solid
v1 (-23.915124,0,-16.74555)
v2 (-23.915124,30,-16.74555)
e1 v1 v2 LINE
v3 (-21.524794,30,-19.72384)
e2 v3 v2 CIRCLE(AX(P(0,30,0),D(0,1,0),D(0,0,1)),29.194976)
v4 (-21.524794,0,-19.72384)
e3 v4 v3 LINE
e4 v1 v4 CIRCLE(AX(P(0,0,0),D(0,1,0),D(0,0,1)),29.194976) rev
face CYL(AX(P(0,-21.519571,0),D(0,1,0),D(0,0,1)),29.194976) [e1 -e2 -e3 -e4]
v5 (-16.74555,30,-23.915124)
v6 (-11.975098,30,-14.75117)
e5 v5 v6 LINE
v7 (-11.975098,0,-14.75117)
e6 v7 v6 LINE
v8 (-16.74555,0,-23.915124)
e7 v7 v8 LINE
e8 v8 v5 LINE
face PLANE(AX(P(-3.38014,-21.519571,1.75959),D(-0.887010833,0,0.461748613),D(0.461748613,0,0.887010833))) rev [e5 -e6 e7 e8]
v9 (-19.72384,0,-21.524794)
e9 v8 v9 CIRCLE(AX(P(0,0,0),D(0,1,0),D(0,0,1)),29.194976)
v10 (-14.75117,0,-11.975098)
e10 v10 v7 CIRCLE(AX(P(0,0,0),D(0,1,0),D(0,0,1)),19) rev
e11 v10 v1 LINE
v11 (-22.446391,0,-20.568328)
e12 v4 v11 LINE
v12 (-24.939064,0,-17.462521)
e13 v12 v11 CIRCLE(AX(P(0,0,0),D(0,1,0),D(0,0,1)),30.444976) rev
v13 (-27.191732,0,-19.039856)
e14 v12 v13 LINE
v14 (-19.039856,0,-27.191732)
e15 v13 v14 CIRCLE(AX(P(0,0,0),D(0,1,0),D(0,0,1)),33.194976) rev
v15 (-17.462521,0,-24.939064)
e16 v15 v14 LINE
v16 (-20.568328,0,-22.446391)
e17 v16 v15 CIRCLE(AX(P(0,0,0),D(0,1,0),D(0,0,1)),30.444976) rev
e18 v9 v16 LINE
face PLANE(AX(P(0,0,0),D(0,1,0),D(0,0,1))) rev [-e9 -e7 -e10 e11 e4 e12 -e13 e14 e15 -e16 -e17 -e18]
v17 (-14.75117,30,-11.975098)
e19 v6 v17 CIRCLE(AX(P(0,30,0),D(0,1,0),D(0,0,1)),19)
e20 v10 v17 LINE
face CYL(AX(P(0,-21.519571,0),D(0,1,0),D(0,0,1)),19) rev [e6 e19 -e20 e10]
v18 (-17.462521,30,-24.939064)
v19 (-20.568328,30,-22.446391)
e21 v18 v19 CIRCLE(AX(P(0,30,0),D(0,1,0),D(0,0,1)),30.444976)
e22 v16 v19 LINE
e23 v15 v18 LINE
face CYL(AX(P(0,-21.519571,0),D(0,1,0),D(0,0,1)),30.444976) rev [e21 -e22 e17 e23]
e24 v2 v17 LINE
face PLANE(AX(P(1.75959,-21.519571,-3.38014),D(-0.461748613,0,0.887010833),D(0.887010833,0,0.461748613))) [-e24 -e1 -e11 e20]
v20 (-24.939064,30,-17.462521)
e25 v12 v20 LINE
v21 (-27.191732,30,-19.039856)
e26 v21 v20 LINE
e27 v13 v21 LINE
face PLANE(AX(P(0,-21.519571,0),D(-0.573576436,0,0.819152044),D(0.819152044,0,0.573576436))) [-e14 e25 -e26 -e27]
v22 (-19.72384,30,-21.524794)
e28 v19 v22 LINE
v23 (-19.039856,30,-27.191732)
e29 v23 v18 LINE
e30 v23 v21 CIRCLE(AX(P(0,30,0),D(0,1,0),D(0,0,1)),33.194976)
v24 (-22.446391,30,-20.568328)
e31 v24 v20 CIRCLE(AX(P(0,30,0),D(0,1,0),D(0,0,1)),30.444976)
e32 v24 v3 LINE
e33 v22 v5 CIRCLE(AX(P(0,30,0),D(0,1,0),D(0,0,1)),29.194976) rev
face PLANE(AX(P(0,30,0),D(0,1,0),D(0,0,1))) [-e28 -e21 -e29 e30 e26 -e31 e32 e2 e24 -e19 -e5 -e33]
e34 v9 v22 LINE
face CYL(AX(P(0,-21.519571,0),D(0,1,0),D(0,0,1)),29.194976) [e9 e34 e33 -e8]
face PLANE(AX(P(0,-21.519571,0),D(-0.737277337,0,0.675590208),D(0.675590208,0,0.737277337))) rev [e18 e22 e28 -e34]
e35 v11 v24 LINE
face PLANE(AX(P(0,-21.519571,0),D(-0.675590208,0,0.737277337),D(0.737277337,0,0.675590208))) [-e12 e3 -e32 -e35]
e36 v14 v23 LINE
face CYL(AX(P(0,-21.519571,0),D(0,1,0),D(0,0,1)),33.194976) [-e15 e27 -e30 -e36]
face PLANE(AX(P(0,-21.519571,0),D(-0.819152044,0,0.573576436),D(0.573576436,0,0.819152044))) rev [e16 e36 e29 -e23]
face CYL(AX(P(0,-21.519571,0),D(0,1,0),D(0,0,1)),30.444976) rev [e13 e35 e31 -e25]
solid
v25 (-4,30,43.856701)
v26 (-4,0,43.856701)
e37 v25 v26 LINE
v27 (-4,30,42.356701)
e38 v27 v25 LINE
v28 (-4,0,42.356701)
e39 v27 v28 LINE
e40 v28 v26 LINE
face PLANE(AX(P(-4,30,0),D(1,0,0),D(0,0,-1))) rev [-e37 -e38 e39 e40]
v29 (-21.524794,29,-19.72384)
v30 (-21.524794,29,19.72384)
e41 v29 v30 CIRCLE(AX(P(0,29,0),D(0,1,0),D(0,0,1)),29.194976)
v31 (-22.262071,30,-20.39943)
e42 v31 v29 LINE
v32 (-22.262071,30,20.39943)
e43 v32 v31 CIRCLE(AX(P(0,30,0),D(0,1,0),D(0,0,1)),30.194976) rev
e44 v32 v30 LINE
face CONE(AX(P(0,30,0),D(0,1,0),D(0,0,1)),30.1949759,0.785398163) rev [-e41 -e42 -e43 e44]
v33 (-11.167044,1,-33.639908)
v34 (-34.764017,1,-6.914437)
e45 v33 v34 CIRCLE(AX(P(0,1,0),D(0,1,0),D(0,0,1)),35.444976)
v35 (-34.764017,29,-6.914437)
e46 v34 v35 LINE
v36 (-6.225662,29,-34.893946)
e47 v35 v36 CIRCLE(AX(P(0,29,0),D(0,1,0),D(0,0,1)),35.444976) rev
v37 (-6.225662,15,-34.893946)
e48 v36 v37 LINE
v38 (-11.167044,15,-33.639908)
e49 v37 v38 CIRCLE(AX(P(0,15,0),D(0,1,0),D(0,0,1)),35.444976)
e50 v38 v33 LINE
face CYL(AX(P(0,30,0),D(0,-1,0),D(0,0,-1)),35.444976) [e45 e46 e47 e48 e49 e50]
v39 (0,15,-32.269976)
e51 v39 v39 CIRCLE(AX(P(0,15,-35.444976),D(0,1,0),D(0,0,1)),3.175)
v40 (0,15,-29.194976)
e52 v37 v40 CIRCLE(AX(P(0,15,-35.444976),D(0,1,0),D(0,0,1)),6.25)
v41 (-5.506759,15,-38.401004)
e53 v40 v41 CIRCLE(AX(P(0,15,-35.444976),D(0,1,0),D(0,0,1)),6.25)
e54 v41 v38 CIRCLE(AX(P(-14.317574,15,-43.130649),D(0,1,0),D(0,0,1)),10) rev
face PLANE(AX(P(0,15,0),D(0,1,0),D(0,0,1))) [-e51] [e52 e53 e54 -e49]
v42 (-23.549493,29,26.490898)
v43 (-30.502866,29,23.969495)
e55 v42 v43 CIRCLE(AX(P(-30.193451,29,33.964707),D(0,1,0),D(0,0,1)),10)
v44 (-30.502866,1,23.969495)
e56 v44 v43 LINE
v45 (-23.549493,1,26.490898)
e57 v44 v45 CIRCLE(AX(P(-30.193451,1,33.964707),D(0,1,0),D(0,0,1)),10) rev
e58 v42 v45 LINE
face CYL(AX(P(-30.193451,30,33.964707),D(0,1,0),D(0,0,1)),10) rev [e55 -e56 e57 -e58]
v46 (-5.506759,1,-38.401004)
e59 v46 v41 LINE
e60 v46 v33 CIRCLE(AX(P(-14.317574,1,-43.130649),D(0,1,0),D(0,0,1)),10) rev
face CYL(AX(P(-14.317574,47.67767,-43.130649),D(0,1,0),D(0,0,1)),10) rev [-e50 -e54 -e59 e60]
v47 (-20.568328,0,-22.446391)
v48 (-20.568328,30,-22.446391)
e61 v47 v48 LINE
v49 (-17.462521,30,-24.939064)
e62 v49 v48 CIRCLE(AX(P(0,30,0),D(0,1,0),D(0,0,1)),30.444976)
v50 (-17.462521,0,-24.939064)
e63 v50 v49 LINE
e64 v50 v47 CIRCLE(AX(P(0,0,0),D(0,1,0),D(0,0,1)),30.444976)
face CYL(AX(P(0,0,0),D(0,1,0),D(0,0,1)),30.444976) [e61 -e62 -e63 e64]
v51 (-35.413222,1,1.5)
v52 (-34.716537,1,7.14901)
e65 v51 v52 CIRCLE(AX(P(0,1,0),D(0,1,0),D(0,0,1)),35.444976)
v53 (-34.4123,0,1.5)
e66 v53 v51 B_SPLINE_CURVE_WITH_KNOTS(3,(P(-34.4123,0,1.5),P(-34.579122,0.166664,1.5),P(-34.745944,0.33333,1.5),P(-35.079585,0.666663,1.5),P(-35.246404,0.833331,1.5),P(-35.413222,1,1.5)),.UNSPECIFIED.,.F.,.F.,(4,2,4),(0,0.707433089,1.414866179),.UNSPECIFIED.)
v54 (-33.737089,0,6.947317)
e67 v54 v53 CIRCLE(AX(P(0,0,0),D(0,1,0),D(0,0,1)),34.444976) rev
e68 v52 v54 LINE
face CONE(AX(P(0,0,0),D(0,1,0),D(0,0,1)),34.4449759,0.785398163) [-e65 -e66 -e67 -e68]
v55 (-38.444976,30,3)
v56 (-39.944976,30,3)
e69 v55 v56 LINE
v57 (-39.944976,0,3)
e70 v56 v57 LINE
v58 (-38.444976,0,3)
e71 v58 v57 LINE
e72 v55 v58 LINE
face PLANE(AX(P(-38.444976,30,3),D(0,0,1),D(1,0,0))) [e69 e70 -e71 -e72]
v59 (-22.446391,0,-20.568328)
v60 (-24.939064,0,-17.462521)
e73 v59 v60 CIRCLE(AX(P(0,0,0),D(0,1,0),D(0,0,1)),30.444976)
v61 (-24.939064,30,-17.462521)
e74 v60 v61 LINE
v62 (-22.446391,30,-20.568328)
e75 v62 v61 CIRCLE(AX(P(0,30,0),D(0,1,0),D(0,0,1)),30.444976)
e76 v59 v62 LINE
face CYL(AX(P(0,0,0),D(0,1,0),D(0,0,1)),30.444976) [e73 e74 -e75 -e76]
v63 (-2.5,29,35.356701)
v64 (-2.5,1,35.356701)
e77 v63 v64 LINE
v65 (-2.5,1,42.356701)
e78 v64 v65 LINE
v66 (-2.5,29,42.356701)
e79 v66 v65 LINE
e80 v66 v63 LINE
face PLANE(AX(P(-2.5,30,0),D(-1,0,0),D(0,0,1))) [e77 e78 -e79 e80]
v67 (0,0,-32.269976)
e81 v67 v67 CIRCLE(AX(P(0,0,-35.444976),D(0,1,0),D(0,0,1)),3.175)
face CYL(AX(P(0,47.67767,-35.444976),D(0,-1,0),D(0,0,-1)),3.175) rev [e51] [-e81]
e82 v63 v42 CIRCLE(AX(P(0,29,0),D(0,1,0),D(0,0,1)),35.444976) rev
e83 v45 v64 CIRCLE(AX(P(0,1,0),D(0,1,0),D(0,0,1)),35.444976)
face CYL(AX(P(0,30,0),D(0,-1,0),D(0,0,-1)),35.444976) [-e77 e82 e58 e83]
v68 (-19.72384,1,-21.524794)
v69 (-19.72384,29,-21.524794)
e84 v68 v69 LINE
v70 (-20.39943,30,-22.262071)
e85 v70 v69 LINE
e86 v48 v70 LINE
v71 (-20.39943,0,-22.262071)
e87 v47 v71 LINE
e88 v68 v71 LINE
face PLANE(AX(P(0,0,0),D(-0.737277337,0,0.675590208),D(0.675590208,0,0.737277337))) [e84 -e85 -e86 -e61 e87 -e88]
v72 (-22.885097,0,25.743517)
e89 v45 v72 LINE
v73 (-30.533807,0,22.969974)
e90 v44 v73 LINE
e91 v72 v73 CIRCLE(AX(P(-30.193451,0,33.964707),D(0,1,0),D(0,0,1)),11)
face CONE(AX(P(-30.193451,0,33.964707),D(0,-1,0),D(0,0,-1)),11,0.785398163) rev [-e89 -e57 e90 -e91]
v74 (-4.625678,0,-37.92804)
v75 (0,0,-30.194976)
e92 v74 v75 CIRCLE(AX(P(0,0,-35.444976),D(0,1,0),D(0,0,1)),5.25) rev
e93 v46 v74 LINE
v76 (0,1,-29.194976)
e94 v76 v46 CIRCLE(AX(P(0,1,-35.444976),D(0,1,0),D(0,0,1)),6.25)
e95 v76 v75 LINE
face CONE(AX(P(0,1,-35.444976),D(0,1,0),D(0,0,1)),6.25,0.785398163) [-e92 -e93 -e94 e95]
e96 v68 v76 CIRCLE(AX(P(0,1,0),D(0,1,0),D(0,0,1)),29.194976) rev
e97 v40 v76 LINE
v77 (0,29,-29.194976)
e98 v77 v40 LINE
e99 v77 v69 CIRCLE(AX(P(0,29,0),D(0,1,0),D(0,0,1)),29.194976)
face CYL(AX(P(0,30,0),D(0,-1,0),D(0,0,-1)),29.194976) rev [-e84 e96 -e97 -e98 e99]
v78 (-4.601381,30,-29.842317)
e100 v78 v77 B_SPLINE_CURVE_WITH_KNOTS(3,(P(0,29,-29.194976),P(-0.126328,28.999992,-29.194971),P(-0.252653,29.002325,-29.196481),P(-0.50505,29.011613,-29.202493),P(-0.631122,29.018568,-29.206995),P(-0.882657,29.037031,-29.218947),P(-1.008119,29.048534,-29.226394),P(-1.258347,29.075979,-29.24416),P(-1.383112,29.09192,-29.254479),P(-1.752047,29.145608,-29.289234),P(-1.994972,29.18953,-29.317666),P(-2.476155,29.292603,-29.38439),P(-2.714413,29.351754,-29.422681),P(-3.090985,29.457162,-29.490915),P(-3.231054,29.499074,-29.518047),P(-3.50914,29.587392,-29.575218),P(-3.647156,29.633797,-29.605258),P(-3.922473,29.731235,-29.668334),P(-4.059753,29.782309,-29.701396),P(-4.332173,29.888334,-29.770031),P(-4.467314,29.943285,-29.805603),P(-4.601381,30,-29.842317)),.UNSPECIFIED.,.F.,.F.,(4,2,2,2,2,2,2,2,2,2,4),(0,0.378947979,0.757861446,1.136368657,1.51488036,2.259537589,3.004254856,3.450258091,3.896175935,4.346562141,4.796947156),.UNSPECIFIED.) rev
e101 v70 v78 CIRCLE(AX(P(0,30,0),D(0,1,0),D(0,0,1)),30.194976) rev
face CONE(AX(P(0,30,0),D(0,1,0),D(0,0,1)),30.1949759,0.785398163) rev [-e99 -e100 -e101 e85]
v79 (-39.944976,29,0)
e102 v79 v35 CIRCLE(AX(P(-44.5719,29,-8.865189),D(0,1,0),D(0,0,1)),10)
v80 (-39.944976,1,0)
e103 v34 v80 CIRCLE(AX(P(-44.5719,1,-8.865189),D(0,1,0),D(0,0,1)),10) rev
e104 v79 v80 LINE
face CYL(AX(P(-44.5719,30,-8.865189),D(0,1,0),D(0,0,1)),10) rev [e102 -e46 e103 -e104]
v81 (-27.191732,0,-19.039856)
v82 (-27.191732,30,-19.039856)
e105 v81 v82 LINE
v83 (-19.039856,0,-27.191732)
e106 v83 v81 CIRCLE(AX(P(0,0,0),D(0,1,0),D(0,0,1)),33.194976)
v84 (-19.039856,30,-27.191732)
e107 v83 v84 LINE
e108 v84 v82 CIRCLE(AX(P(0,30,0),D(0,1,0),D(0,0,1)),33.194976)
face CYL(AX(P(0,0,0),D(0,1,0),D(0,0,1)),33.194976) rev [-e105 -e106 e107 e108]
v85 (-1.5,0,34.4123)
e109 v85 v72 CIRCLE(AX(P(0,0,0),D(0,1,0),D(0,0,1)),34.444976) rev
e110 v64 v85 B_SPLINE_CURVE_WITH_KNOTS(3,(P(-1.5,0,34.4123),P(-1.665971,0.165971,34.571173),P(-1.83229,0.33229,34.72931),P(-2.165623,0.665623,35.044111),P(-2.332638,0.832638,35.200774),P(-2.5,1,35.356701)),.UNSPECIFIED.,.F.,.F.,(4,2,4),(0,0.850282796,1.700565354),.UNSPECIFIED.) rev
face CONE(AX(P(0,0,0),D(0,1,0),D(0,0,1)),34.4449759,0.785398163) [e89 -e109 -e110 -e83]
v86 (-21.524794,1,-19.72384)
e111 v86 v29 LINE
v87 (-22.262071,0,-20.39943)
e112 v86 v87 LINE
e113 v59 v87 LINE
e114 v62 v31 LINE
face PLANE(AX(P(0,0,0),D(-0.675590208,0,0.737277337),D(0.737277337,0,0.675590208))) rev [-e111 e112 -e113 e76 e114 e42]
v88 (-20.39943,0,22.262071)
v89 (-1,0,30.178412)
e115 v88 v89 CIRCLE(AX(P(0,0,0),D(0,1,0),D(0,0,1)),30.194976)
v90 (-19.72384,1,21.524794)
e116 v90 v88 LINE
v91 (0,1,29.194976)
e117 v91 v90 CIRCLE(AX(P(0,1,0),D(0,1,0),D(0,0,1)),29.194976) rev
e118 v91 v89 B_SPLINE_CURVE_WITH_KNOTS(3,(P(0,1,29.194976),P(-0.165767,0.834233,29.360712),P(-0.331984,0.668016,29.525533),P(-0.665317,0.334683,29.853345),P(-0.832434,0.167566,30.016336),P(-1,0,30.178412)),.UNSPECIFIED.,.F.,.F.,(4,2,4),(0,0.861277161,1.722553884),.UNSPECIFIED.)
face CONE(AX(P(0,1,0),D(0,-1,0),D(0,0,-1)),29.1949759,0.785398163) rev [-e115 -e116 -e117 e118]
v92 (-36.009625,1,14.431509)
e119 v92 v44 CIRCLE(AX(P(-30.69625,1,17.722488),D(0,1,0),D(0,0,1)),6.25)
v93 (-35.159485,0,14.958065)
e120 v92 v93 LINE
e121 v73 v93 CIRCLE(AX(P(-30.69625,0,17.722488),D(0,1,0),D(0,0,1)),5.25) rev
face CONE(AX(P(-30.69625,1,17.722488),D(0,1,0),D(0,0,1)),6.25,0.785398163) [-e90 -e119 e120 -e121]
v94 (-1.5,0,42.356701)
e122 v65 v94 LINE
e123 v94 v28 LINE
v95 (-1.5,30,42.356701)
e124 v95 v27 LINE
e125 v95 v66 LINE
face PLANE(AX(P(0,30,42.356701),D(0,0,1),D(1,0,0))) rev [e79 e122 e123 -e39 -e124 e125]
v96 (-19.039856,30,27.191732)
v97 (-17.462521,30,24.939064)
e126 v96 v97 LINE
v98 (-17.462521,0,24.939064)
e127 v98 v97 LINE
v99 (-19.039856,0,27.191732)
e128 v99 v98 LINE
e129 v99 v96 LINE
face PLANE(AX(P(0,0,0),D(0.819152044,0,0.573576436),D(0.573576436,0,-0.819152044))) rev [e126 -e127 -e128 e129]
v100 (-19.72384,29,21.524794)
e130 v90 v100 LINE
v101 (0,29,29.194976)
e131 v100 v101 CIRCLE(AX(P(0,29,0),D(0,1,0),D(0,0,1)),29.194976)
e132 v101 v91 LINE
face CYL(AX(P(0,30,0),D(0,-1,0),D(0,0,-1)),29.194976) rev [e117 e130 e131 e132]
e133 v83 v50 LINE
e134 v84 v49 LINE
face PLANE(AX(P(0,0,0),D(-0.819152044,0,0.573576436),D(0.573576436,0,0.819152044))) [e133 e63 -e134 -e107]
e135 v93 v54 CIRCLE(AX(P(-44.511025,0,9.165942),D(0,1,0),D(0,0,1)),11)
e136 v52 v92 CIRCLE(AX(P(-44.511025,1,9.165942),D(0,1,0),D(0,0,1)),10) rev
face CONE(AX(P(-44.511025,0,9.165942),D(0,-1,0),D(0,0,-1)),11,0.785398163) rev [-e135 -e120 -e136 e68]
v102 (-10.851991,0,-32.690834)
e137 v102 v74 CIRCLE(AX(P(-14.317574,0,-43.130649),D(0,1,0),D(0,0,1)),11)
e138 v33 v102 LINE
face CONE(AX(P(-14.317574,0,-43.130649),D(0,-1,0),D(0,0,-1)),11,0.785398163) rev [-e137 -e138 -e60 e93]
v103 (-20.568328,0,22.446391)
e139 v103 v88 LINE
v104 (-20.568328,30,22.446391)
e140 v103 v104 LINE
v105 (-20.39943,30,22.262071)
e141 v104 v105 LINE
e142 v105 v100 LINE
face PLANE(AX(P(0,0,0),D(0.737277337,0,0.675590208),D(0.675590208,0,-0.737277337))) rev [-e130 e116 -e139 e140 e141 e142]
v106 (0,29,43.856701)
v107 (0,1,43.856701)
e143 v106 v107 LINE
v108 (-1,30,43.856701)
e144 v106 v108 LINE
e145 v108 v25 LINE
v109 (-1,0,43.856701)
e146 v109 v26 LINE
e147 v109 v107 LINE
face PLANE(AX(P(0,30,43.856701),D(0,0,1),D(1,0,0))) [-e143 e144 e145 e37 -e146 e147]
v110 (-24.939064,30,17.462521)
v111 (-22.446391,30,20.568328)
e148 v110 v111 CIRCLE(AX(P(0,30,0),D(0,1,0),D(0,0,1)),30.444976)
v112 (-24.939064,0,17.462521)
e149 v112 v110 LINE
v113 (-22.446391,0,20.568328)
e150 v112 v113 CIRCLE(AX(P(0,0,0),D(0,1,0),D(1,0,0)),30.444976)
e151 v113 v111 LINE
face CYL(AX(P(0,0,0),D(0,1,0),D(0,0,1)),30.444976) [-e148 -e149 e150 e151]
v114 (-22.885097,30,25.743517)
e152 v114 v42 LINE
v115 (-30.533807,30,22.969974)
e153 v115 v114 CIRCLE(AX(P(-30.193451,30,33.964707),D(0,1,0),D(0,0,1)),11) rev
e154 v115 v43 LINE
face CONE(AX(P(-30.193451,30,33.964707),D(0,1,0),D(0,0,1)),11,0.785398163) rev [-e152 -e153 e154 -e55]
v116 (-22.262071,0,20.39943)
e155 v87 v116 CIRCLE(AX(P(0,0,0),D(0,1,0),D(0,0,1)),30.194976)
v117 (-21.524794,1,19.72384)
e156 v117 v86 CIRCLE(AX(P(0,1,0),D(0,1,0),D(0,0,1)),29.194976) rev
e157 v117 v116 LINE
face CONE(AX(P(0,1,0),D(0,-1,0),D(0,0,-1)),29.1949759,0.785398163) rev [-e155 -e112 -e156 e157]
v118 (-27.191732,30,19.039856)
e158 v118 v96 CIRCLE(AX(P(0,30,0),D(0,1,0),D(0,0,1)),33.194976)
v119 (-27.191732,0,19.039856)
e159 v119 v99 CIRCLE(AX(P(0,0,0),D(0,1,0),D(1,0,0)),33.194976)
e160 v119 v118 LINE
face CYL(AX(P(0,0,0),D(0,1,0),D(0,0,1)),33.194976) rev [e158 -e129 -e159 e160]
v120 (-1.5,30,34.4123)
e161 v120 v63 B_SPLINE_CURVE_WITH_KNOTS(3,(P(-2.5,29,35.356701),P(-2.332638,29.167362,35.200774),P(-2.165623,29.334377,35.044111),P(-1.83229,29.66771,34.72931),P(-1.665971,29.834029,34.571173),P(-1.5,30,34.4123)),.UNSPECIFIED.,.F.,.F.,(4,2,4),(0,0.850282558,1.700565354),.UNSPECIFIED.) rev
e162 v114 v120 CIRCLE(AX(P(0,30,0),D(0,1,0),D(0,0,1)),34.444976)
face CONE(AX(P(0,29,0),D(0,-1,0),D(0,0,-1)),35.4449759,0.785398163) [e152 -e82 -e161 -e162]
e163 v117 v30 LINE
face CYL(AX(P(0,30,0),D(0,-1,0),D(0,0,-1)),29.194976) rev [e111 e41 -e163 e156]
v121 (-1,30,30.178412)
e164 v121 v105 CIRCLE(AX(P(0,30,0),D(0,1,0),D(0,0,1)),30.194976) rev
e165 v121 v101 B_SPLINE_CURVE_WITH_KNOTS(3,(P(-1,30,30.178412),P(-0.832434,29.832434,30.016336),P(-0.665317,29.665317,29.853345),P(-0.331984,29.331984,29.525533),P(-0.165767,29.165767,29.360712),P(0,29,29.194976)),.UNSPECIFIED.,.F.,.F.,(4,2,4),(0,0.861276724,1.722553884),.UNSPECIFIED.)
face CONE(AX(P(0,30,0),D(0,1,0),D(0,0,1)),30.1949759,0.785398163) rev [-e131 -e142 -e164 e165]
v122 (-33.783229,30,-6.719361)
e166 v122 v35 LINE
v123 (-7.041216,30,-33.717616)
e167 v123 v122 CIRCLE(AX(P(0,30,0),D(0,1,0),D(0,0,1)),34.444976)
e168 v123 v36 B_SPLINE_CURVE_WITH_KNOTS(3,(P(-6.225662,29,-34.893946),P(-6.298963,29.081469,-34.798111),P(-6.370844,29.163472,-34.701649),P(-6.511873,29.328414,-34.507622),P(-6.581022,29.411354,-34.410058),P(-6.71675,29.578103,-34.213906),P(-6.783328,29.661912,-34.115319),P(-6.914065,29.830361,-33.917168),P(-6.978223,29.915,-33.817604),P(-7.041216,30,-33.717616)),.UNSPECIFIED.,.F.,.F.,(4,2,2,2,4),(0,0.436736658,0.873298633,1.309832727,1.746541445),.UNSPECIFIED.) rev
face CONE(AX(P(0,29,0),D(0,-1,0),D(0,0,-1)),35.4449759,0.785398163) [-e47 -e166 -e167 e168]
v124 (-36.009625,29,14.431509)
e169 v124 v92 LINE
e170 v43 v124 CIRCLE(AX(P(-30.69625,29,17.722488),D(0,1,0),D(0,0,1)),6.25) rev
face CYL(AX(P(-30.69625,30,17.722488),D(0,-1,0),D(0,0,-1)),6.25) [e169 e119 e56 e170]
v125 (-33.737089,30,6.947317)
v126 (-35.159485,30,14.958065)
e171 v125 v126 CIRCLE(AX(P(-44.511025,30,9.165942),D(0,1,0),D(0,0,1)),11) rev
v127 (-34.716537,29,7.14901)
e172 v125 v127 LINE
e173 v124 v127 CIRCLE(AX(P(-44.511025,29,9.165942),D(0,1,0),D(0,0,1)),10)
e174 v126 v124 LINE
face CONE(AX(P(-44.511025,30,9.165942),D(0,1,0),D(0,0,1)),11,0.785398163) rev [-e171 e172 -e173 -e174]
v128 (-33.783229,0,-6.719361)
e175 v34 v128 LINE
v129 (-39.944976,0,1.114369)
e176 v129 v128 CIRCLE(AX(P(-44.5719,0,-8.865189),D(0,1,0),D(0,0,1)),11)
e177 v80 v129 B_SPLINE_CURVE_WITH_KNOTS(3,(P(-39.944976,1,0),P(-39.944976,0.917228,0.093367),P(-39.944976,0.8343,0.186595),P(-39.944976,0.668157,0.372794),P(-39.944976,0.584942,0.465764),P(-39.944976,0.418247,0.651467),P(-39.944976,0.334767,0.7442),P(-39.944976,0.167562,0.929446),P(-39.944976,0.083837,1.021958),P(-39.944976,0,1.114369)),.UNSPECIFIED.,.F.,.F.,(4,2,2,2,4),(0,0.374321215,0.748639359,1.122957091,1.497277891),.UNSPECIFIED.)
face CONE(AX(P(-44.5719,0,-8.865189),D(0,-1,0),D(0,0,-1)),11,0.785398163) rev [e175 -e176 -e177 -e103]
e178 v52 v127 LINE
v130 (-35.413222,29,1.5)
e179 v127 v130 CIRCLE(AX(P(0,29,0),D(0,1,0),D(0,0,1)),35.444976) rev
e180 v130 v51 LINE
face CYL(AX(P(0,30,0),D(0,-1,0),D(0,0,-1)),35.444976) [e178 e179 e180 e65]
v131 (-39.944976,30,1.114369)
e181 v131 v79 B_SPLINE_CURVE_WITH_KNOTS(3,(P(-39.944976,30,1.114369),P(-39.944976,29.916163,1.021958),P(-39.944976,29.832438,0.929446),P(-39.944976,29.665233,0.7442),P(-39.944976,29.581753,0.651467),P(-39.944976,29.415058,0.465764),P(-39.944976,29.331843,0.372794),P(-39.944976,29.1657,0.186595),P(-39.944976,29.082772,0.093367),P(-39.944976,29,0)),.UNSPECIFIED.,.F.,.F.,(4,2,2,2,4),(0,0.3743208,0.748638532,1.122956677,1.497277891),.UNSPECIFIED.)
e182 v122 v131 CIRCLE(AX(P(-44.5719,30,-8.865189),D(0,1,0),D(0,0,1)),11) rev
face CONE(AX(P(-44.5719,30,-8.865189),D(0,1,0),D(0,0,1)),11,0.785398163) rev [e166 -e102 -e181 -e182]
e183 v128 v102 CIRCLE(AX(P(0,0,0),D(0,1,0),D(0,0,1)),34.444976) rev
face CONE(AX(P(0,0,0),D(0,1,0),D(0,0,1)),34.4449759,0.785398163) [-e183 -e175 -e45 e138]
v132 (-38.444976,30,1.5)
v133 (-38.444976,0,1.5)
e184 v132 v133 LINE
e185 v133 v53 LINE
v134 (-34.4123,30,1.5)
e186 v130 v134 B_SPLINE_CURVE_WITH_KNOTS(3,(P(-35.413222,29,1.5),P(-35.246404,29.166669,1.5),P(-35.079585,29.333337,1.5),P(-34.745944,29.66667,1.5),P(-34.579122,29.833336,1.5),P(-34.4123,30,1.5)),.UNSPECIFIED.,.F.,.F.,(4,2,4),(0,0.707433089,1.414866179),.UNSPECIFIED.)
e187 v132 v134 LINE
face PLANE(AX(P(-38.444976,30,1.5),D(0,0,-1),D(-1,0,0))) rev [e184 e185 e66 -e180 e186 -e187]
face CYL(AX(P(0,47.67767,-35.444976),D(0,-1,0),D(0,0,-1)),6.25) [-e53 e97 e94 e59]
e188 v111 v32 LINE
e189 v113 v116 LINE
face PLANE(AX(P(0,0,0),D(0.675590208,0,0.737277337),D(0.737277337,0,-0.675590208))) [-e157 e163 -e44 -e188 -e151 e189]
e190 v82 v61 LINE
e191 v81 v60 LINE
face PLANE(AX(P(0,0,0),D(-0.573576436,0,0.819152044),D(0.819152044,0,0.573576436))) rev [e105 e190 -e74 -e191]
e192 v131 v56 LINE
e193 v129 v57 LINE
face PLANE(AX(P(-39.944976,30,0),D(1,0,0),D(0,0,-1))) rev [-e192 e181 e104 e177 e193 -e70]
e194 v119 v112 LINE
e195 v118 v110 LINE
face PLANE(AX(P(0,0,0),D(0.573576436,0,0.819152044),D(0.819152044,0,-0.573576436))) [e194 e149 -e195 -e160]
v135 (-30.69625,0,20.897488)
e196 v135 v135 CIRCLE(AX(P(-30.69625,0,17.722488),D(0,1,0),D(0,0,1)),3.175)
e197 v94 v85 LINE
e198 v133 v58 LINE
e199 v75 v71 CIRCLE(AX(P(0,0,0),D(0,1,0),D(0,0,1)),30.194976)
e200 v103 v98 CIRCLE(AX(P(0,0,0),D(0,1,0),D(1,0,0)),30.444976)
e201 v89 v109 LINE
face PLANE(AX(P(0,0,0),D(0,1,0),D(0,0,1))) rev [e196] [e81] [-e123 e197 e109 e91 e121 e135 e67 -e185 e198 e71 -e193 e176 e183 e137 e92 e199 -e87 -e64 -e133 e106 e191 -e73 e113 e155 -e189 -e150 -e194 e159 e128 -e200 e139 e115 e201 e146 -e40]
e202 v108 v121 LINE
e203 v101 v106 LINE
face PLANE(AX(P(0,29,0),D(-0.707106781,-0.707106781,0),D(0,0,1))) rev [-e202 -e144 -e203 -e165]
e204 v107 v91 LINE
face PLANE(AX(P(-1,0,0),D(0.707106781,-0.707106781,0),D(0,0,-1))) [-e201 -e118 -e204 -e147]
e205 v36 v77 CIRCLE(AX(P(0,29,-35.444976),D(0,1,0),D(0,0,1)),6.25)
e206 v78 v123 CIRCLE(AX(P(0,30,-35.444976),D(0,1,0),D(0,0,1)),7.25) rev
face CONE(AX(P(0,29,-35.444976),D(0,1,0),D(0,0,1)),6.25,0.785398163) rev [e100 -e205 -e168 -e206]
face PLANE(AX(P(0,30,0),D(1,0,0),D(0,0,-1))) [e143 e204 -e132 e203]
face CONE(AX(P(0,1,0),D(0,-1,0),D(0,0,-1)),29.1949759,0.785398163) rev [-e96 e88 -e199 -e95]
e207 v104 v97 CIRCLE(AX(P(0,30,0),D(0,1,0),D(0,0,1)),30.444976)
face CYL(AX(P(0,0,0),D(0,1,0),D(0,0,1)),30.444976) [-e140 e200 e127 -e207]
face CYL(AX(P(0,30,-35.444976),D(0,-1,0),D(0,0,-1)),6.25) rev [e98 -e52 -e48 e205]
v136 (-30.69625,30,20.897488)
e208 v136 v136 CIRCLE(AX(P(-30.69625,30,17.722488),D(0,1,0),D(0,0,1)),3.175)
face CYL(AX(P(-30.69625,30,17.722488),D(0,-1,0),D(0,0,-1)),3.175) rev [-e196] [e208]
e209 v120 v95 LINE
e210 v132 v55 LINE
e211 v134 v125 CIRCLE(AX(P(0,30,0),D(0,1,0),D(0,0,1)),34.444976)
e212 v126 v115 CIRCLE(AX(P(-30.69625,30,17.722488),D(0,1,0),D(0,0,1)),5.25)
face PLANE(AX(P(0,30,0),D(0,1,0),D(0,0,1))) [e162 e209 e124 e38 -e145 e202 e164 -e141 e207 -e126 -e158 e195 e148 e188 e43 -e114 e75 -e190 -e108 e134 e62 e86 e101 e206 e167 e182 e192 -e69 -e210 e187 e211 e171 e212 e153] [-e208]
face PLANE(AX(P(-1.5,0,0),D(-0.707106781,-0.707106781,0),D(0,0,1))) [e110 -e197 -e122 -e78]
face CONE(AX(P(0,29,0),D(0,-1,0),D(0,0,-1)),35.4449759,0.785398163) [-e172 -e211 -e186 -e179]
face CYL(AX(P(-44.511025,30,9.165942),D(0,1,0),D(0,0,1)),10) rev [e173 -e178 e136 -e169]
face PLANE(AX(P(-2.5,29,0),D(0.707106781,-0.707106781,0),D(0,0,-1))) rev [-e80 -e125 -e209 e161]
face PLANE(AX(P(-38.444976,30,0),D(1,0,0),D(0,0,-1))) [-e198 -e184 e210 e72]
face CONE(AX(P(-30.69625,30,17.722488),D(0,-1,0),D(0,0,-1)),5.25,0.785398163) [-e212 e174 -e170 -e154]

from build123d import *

# Parameters (mm, degrees)
SKETCH3_R           = 3.175
BOSS_EXTRUDE2_DEPTH = 30
SKETCH3_6_R         = 6.25
SKETCH3_6_R_2       = 3.175
BOSS_EXTRUDE3_DEPTH = 15
FILLET1_R           = 10
CHAMFER1_SIZE       = 1
JAW_SLOT_DEPTH      = 67.475644682
TPU_JAW_DEPTH       = 30
SLOT_PATTERN_COUNT  = 2
SLOT_PATTERN_ANGLE  = 90


with BuildPart() as part:
    # Sketch3 → Boss-Extrude2 (new body)
    with BuildSketch(Plane(origin=(0, 0, 0), x_dir=(1, 0, 0), z_dir=(0, 1, 0))):
        with BuildLine():
            ThreePointArc((0, 29.1949759), (-4.220104361, 30.834854515), (-6.225661875, 34.893945761))
            ThreePointArc((-6.225661875, 34.893945761), (-27.175492191, 22.756074809), (-35.4449759, 0))
            Line((-35.4449759, 0), (-39.9449759, 0))
            Line((-39.9449759, 0), (-39.9449759, -3))
            Line((-39.9449759, -3), (-38.4449759, -3))
            Line((-38.4449759, -3), (-38.4449759, -1.5))
            Line((-38.4449759, -1.5), (-35.413222341, -1.5))
            ThreePointArc((-35.413222341, -1.5), (-34.775367062, -6.857124927), (-33.331874405, -12.055391541))
            ThreePointArc((-33.331874405, -12.055391541), (-36.10890834, -20.84748795), (-27.10621253, -22.83855422))
            ThreePointArc((-27.10621253, -22.83855422), (-16.071961789, -31.591745137), (-2.5, -35.356701155))
            Line((-2.5, -35.356701155), (-2.5, -42.356701155))
            Line((-2.5, -42.356701155), (-4, -42.356701155))
            Line((-4, -42.356701155), (-4, -43.856701155))
            Line((-4, -43.856701155), (0, -43.856701155))
            Line((0, -43.856701155), (0, -29.1949759))
            ThreePointArc((0, -29.1949759), (-29.1949759, 0), (0, 29.1949759))
        make_face()
        with Locations(Location((-30.696249566, -17.72248795, 0), (0, 0, 270))):
            Circle(SKETCH3_R, mode=Mode.SUBTRACT)
    extrude(amount=BOSS_EXTRUDE2_DEPTH)

    # Sketch3<6> → Boss-Extrude3 (add)
    with BuildSketch(Plane(origin=(0, 0, 0), x_dir=(1, 0, 0), z_dir=(0, 1, 0))):
        with Locations((0, 35.4449759)):
            Circle(SKETCH3_6_R)
        with Locations(Location((0, 35.4449759, 0), (0, 0, 270))):
            Circle(SKETCH3_6_R_2, mode=Mode.SUBTRACT)
    extrude(amount=BOSS_EXTRUDE3_DEPTH)

    # Fillet1
    # the kernel refuses this fillet: 10 mm, written as the material it adds along each edge
    with BuildSketch(Plane(origin=(-27.10621253, 0, 22.83855422), x_dir=(0.6976659907384, 0, 0.7164231747835959), z_dir=(0, 1, 0))) as fillet1_piece_1:
        with BuildLine():
            CenterArc((5.817172713, -9.974107894), FILLET1_R, 94.123965917, 43.409086789)
            ThreePointArc((-1.559496763, -3.222460137), (-0.544085424, -1.725278219), (0, 0))
            ThreePointArc((0, 0), (2.549013098, -0.091774506), (5.098026196, 0))
        make_face()
    extrude(amount=30)
    with BuildSketch(Plane(origin=(-33.331874405, 0, 12.055391541), x_dir=(-0.27160767385328266, 0, -0.9624080587276942), z_dir=(0, 1, 0))) as fillet1_piece_2:
        with BuildLine():
            CenterArc((5.817172713, 9.974107894), FILLET1_R, 222.466947294, 43.409086789)
            ThreePointArc((-1.559496763, 3.222460137), (-0.544085424, 1.725278219), (0, 0))
            ThreePointArc((0, 0), (2.549013098, 0.091774506), (5.098026196, 0))
        make_face()
    extrude(amount=30)
    with BuildSketch(Plane(origin=(-6.225661875, 0, -34.893945761), x_dir=(-0.9692736645916937, 0, 0.24598488394409268), z_dir=(0, 1, 0))) as fillet1_piece_3:
        with BuildLine():
            CenterArc((5.817172713, -9.974107894), FILLET1_R, 94.123965917, 43.409086789)
            ThreePointArc((-1.559496763, -3.222460137), (-0.544085424, -1.725278219), (0, 0))
            ThreePointArc((0, 0), (2.549013098, -0.091774506), (5.098026196, 0))
        make_face()
    extrude(amount=15)
    with BuildSketch(Plane(origin=(-35.4449759, 0, 0), x_dir=(-1, 0, 0), z_dir=(0, 1, 0))) as fillet1_piece_4:
        with BuildLine():
            CenterArc((9.126923994, -8.865188907), FILLET1_R, 117.560980045, 51.189901885)
            ThreePointArc((-0.680958838, -6.914436655), (-0.17065051, -3.473943695), (0, 0))
            Line((0, 0), (4.5, 0))
        make_face()
    extrude(amount=30)

    # Chamfer1
    chamfer1_edges = [part.edges().sort_by_distance(p)[0] for p in [
        (-36.569195939, 0, -2.868795874),
        (-36.569195939, 30, -2.868795874),
        (-26.570252382, 0, -23.459923378),
        (-24.814344184, 30, -25.309971143),
        (-7.880536789, 0, -35.477901284),
        (5.363659035, 0, -38.653349594),
        (-29.1949759, 0, 0),
        (0, 0, 36.525838527),
        (-2.5, 0, 38.856701155),
        (-13.758438746, 0, 32.665756991),
        (-26.784495391, 0, 24.563695697),
        (-36.10890834, 0, 20.84748795),
        (-34.665032179, 0, 10.914205587),
        (-35.178454065, 0, 4.338511975),
        (-4.220104361, 30, -30.834854515),
        (-29.1949759, 30, 0),
        (0, 30, 36.525838527),
        (-2.5, 30, 38.856701155),
        (-13.758438746, 30, 32.665756991),
        (-26.784495391, 30, 24.563695697),
        (-36.10890834, 30, 20.84748795),
        (-34.665032179, 30, 10.914205587),
        (-35.178454065, 30, 4.338511975),
    ]]
    chamfer(chamfer1_edges, length=CHAMFER1_SIZE)

    # Sketch4 → jaw_slot (cut, symmetric)
    with BuildSketch(Plane(origin=(0, 30, 0), x_dir=(1, 0, 0), z_dir=(0, 1, 0))):
        with BuildLine():
            ThreePointArc((-17.462520782, 24.939064247), (-21.527848912, 21.527848912), (-24.939064247, 17.462520782))
            Line((-24.939064247, 17.462520782), (-27.191732369, 19.039855981))
            ThreePointArc((-27.191732369, 19.039855981), (-23.47239256, 23.47239256), (-19.039855981, 27.191732369))
            Line((-19.039855981, 27.191732369), (-17.462520782, 24.939064247))
        make_face()
        with BuildLine():
            ThreePointArc((-20.399430037, 22.262071417), (-21.351072217, 21.351072217), (-22.262071417, 20.399430037))
            Line((-22.262071417, 20.399430037), (-21.52479408, 19.72383983))
            ThreePointArc((-21.52479408, 19.72383983), (-22.768708689, 18.273820686), (-23.915124191, 16.745550236))
            Line((-23.915124191, 16.745550236), (-14.751170485, 11.975097884))
            ThreePointArc((-14.751170485, 11.975097884), (-13.435028843, 13.435028843), (-11.975097884, 14.751170485))
            Line((-11.975097884, 14.751170485), (-16.745550236, 23.915124191))
            ThreePointArc((-16.745550236, 23.915124191), (-18.273820686, 22.768708689), (-19.72383983, 21.52479408))
            Line((-19.72383983, 21.52479408), (-20.399430037, 22.262071417))
        make_face()
        with BuildLine():
            ThreePointArc((-20.568327589, 22.446390751), (-21.527848912, 21.527848912), (-22.446390751, 20.568327589))
            Line((-22.446390751, 20.568327589), (-22.262071417, 20.399430037))
            ThreePointArc((-22.262071417, 20.399430037), (-21.351072217, 21.351072217), (-20.399430037, 22.262071417))
            Line((-20.399430037, 22.262071417), (-20.568327589, 22.446390751))
        make_face()
    jaw_slot = extrude(amount=JAW_SLOT_DEPTH, both=True, mode=Mode.SUBTRACT)

    # slot_pattern: jaw_slot ×2 about axis
    slot_pattern_axis = Axis((0, -1.524877817, 0), (0, 1, 0))
    for i in range(1, SLOT_PATTERN_COUNT):
        add(jaw_slot.rotate(slot_pattern_axis, i * SLOT_PATTERN_ANGLE / (SLOT_PATTERN_COUNT - 1)), mode=Mode.SUBTRACT)


with BuildPart() as body_2:
    # Sketch4<3> → tpu_jaw (new body)
    with BuildSketch(Plane(origin=(0, 30, 0), x_dir=(1, 0, 0), z_dir=(0, 1, 0))):
        with BuildLine():
            ThreePointArc((-17.462520782, 24.939064247), (-21.527848912, 21.527848912), (-24.939064247, 17.462520782))
            Line((-24.939064247, 17.462520782), (-27.191732369, 19.039855981))
            ThreePointArc((-27.191732369, 19.039855981), (-23.47239256, 23.47239256), (-19.039855981, 27.191732369))
            Line((-19.039855981, 27.191732369), (-17.462520782, 24.939064247))
        make_face()
        with BuildLine():
            ThreePointArc((-20.399430037, 22.262071417), (-21.351072217, 21.351072217), (-22.262071417, 20.399430037))
            Line((-22.262071417, 20.399430037), (-21.52479408, 19.72383983))
            ThreePointArc((-21.52479408, 19.72383983), (-22.768708689, 18.273820686), (-23.915124191, 16.745550236))
            Line((-23.915124191, 16.745550236), (-14.751170485, 11.975097884))
            ThreePointArc((-14.751170485, 11.975097884), (-13.435028843, 13.435028843), (-11.975097884, 14.751170485))
            Line((-11.975097884, 14.751170485), (-16.745550236, 23.915124191))
            ThreePointArc((-16.745550236, 23.915124191), (-18.273820686, 22.768708689), (-19.72383983, 21.52479408))
            Line((-19.72383983, 21.52479408), (-20.399430037, 22.262071417))
        make_face()
        with BuildLine():
            ThreePointArc((-20.568327589, 22.446390751), (-21.527848912, 21.527848912), (-22.446390751, 20.568327589))
            Line((-22.446390751, 20.568327589), (-22.262071417, 20.399430037))
            ThreePointArc((-22.262071417, 20.399430037), (-21.351072217, 21.351072217), (-20.399430037, 22.262071417))
            Line((-20.399430037, 22.262071417), (-20.568327589, 22.446390751))
        make_face()
    extrude(amount=-TPU_JAW_DEPTH)


solid = Compound([part.part, body_2.part])
